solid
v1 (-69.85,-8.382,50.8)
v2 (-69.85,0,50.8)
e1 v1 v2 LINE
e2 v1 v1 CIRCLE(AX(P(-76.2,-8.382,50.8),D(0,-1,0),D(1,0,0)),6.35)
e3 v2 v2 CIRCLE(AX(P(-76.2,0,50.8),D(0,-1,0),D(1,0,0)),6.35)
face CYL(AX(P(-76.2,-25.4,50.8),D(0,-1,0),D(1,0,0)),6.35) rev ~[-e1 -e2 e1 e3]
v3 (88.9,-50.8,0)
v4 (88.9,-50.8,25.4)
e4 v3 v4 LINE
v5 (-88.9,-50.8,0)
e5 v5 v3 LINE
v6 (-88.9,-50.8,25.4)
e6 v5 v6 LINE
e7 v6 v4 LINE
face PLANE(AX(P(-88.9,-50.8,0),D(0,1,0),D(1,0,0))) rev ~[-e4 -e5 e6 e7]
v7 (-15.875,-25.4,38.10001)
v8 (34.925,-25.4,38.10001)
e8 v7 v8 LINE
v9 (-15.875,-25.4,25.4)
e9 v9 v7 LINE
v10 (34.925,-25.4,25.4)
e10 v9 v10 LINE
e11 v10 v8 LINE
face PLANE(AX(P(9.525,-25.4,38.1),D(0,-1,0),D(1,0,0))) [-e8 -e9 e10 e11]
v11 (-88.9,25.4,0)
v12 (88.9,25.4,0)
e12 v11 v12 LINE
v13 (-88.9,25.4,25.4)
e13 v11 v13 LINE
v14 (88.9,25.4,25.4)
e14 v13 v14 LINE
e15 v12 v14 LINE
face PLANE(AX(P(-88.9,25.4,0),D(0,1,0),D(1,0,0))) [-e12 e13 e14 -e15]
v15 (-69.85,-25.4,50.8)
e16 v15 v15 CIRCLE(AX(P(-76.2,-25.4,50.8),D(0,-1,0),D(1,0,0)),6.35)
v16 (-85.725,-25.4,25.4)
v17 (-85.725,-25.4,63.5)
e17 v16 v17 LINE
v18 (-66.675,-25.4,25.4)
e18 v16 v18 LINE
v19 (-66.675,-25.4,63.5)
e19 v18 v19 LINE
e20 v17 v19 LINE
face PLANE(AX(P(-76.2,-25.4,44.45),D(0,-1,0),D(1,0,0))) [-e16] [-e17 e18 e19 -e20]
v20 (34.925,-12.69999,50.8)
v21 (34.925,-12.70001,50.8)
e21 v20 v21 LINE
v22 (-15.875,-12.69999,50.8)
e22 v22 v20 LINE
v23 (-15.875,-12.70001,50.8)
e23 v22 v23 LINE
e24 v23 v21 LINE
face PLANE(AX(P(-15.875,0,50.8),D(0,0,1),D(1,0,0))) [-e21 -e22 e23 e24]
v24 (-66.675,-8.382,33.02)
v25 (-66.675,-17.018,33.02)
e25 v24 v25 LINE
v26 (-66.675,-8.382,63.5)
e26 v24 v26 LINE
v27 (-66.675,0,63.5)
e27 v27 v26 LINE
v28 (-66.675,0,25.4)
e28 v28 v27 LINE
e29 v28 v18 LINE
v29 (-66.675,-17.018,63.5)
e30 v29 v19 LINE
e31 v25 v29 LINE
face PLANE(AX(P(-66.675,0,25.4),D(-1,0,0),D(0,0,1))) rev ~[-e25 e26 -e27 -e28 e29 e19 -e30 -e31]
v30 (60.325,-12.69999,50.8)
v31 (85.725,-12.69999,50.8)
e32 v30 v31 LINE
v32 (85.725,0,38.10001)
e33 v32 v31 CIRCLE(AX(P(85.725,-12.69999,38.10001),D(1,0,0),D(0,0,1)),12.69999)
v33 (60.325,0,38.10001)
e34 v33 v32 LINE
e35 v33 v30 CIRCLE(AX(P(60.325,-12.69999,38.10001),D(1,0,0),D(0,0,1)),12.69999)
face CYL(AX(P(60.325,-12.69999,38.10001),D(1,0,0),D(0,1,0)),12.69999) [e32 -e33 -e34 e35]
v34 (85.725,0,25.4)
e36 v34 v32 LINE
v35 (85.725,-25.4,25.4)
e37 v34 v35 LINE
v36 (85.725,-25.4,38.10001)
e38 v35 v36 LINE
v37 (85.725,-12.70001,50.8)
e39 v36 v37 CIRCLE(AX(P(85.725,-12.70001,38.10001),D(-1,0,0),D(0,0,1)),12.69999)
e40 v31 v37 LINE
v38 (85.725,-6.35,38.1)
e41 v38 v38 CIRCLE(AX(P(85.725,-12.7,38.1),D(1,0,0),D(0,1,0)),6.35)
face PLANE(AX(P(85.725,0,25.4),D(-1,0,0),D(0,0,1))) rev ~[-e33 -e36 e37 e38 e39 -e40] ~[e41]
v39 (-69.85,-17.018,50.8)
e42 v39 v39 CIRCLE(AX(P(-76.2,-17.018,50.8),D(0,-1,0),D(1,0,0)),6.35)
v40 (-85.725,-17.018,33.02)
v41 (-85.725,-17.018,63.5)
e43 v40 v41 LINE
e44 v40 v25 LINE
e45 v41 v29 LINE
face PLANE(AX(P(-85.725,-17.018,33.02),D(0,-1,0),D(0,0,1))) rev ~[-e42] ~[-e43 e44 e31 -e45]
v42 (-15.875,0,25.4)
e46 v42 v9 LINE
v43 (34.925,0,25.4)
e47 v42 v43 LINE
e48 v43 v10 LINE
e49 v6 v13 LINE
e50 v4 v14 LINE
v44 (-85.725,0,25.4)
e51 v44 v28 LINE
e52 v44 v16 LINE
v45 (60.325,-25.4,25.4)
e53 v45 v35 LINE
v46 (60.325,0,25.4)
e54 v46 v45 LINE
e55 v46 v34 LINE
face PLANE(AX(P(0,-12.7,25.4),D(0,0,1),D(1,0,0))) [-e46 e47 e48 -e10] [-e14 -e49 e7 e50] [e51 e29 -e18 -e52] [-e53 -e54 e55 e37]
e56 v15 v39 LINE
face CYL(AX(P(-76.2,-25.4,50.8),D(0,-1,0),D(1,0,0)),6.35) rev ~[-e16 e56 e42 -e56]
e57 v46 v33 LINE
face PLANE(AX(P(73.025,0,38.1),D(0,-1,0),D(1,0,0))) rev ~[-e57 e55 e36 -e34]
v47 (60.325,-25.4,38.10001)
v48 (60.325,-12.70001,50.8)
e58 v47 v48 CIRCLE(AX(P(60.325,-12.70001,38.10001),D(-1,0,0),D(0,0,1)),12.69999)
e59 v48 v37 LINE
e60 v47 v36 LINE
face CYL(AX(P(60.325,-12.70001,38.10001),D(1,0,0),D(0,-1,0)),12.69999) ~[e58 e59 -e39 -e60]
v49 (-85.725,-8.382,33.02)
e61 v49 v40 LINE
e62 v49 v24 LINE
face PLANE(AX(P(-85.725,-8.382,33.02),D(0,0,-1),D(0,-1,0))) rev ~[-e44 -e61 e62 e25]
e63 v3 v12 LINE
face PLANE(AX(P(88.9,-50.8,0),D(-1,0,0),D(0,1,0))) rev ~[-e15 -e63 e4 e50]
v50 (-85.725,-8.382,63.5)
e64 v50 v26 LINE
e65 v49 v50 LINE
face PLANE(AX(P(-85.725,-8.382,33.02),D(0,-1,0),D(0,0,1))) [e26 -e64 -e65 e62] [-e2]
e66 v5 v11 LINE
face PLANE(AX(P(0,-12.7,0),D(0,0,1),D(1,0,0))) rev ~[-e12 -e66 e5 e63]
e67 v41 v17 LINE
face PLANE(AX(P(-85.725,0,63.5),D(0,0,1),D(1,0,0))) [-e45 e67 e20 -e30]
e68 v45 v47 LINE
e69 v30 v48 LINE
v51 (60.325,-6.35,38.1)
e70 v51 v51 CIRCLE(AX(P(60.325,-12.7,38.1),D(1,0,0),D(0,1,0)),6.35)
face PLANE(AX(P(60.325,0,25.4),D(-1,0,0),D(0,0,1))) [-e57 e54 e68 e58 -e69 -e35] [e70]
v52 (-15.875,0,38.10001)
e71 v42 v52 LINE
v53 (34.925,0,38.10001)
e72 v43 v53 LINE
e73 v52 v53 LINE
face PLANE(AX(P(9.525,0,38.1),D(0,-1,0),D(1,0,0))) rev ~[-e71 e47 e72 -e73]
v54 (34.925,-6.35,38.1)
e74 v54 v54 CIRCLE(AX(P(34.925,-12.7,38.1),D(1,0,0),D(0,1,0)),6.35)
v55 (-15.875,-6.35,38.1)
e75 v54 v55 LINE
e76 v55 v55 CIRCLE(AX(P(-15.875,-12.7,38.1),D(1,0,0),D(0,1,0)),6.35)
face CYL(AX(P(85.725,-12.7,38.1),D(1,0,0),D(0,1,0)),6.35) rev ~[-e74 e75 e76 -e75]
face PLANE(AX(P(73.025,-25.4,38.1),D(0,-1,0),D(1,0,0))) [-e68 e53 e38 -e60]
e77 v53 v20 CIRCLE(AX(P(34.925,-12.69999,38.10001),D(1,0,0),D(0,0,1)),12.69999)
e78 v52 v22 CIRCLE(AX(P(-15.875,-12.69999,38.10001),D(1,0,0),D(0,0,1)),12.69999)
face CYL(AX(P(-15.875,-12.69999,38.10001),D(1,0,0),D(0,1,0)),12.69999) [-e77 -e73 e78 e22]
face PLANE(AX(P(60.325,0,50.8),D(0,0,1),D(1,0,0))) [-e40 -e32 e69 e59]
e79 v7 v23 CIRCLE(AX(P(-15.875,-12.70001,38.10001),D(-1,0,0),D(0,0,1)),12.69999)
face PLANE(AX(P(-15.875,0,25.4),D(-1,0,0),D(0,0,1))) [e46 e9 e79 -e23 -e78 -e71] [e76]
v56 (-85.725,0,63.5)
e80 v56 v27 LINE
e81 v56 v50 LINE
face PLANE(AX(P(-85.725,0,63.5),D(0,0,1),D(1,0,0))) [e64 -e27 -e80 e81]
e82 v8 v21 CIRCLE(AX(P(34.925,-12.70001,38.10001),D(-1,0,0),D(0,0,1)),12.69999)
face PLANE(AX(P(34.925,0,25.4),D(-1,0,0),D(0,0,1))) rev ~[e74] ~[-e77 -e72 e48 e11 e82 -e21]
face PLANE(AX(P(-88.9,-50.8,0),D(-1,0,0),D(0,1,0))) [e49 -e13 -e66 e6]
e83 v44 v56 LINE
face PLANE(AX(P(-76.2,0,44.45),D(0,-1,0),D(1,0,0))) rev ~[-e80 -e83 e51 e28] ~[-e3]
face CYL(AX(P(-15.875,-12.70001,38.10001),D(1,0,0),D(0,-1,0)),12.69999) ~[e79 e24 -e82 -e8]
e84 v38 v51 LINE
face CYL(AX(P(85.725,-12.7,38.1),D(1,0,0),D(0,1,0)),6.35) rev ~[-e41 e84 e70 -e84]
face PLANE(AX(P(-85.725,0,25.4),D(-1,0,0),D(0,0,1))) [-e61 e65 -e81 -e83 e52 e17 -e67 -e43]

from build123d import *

# Parameters (mm, degrees)
F0_W      = 177.8
F0_H      = 76.2
F1_DEPTH  = 25.4
F2_W      = 19.05
F2_H      = 38.1
F2_W_2    = 50.8
F2_H_2    = 25.4
F2_W_3    = 25.4
F3_DEPTH  = 25.4
F4_R      = 6.35
F5_DEPTH  = 101.6
F6_R      = 12.69999
F7_W      = 8.636
F7_H      = 30.48
F8_DEPTH  = 25.4
F9_R      = 6.35
F10_DEPTH = 25.4


# Not quite as in the source:
# - a fillet or chamfer is up to 0.001 mm smaller than in the source, because OpenCascade refuses the exact size


with BuildPart() as f1:
    # F0 (on Top) → F1 (new body)
    with BuildSketch(Plane.XY):
        with Locations((0, -12.7)):
            Rectangle(F0_W, F0_H)
    extrude(amount=F1_DEPTH)

    # F2 (on Front) → F3 (join)
    with BuildSketch(Plane.XZ):
        with Locations((-76.2, 44.45)):
            Rectangle(F2_W, F2_H)
        with Locations((9.525, 38.1)):
            Rectangle(F2_W_2, F2_H_2)
        with Locations((73.025, 38.1)):
            Rectangle(F2_W_3, F2_H_2)
    extrude(amount=F3_DEPTH)

    # F4 (on face) → F5 (cut, through all)
    with BuildSketch(Plane.YZ.offset(85.725)):
        with Locations((-12.7, 38.1)):
            Circle(F4_R)
    extrude(amount=-F5_DEPTH, mode=Mode.SUBTRACT)

    # F6 (radius 12.7 in the source; OpenCascade refuses exactly that, so slightly less here)
    f6_edges = [f1.edges().sort_by_distance(p)[0] for p in [
        (9.525, -25.4, 50.8),
        (9.525, 0, 50.8),
        (73.025, -25.4, 50.8),
        (73.025, 0, 50.8),
    ]]
    fillet(f6_edges, radius=F6_R)

    # F7 (on face) → F8 (cut)
    with BuildSketch(Plane(origin=(-85.725, 0, 0), x_dir=(0, -1, 0), z_dir=(-1, 0, 0))):
        with Locations((12.7, 48.26)):
            Rectangle(F7_W, F7_H)
    extrude(amount=-F8_DEPTH, mode=Mode.SUBTRACT)

    # F9 (on face) → F10 (cut)
    with BuildSketch(Plane.XZ.offset(25.4)):
        with Locations((-76.2, 50.8)):
            Circle(F9_R)
    extrude(amount=-F10_DEPTH, mode=Mode.SUBTRACT)


solid = f1.part
